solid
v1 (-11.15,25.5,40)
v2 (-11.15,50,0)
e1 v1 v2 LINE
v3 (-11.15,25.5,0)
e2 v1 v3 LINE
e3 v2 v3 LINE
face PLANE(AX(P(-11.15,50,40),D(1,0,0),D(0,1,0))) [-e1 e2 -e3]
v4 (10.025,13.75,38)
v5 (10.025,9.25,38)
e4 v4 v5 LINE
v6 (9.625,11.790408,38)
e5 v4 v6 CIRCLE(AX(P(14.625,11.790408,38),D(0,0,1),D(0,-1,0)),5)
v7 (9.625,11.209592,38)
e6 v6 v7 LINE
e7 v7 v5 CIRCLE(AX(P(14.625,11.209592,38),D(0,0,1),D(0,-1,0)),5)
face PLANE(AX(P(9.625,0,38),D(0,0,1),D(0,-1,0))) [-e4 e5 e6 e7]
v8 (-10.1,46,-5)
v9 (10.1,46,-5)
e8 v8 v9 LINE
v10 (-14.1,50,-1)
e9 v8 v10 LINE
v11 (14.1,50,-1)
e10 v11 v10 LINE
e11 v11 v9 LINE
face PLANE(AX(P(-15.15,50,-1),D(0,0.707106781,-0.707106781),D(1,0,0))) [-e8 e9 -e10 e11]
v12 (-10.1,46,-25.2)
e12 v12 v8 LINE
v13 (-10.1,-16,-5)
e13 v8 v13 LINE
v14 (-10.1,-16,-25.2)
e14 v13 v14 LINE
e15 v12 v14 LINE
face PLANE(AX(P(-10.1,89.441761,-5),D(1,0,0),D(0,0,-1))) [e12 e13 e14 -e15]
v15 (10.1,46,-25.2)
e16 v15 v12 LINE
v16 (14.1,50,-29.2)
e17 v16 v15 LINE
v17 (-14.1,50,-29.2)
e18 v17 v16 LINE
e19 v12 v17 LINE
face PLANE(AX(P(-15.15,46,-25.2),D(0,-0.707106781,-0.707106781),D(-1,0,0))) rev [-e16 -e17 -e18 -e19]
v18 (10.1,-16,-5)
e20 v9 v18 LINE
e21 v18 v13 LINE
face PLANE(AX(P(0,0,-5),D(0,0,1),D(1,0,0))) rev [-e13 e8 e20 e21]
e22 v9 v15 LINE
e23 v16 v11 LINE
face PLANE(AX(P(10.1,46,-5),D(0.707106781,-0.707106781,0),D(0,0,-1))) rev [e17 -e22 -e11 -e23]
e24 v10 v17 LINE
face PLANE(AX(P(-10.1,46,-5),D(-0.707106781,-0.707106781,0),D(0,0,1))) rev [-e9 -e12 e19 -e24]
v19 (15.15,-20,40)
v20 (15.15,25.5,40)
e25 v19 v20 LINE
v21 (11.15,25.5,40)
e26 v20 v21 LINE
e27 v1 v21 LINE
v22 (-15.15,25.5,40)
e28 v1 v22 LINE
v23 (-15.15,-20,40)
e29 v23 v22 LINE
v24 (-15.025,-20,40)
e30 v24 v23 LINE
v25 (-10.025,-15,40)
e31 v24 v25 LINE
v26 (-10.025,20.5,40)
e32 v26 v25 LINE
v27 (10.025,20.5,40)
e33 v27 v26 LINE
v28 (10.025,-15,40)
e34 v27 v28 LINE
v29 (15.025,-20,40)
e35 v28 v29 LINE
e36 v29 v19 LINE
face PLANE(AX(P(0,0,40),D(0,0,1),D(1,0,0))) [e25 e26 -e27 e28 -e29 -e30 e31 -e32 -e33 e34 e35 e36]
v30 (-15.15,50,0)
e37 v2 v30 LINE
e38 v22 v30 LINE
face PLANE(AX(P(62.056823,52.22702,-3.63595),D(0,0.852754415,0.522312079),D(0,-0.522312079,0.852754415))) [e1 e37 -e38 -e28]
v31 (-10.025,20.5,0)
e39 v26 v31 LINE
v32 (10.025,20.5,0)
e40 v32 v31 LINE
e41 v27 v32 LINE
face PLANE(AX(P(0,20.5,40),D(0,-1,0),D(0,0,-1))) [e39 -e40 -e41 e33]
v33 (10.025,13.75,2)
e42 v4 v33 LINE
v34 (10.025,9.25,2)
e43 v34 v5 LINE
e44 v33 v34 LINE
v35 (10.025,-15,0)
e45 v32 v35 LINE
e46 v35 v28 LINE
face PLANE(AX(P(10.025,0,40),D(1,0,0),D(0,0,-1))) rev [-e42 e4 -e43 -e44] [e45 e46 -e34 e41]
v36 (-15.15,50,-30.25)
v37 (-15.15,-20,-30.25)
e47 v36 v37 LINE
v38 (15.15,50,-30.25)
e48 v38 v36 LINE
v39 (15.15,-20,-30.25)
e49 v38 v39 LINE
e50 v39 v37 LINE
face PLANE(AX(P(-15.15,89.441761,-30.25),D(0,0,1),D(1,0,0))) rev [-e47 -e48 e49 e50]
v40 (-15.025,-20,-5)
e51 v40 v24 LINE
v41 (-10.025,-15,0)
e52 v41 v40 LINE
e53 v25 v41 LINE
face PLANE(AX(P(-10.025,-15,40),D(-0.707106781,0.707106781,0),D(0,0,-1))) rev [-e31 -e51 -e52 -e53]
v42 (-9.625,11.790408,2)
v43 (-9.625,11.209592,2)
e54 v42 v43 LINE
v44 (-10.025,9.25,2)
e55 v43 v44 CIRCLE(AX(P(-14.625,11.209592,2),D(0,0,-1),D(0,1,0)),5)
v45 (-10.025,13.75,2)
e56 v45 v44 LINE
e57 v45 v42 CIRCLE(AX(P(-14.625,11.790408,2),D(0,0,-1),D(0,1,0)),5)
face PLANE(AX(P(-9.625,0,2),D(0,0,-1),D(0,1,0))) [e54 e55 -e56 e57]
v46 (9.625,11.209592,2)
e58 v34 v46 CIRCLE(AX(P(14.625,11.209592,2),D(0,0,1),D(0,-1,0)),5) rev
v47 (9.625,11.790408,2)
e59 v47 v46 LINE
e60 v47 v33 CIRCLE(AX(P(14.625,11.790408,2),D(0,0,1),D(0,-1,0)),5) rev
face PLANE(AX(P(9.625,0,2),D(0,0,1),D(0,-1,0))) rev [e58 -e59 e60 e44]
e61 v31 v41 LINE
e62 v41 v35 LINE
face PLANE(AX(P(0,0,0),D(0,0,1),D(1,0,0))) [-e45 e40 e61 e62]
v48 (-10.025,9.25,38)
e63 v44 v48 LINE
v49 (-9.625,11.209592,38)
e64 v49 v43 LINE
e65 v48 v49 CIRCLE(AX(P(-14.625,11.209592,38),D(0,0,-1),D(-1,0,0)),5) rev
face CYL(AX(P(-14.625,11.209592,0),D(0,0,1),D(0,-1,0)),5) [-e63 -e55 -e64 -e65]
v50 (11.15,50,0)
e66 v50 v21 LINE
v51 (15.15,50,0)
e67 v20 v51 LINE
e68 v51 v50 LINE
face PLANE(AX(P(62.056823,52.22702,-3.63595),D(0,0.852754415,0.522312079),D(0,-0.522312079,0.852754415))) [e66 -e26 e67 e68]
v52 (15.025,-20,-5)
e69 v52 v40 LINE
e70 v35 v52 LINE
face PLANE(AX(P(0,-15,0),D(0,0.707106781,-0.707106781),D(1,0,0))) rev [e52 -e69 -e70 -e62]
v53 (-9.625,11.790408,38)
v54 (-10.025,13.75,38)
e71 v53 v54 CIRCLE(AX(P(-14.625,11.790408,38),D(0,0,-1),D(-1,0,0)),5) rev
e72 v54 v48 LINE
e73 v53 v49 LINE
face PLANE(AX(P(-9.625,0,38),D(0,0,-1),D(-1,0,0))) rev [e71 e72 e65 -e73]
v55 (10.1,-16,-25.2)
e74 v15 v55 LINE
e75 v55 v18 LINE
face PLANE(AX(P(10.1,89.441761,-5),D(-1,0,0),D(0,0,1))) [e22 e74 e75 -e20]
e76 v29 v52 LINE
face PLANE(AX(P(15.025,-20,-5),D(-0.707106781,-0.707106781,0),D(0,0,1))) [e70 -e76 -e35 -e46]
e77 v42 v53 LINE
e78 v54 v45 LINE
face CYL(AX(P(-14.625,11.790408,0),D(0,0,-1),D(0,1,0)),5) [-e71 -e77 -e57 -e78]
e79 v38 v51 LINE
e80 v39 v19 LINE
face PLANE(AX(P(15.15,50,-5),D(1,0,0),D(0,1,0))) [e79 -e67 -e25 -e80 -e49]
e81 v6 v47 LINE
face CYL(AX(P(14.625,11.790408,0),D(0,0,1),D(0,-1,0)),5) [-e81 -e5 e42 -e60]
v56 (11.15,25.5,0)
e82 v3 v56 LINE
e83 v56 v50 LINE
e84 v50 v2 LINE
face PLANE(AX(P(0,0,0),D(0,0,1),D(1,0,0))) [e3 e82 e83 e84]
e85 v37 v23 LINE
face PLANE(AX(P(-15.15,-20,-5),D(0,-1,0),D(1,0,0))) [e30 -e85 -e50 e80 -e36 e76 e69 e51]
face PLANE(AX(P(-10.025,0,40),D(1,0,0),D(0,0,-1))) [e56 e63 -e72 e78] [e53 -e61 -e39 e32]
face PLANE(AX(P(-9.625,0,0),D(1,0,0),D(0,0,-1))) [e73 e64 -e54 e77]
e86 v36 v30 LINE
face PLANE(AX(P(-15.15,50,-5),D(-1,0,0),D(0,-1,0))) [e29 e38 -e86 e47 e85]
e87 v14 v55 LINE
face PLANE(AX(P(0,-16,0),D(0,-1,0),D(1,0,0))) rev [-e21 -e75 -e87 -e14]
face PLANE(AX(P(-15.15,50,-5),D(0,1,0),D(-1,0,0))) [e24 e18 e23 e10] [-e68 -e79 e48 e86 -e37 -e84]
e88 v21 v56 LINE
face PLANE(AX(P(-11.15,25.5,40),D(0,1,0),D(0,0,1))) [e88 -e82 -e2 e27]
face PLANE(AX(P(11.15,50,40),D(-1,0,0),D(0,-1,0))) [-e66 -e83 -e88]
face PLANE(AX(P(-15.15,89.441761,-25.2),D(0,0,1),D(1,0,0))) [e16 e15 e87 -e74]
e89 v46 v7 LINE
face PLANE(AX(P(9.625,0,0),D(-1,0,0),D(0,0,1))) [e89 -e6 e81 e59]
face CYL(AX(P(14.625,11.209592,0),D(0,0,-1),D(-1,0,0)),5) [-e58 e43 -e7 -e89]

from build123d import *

# Parameters (mm, degrees)
CROQUIS2_W               = 30.3
CROQUIS2_H               = 70
SALIENTE_EXTRUIR2_DEPTH  = 5
SALIENTE_EXTRUIR3_START  = -20
SALIENTE_EXTRUIR3_DEPTH  = 70
SALIENTE_EXTRUIR4_START  = -20
CROQUIS4_W               = 20.2
CROQUIS4_H               = 20.2
SALIENTE_EXTRUIR4_DEPTH  = 4
CHAFL_N4_SIZE            = 4
CROQUIS6_W               = 30.3
CROQUIS6_H               = 5
CROQUIS6_W_2             = 5.125
CROQUIS6_H_2             = 40.5
SALIENTE_EXTRUIR6_DEPTH  = 40
SALIENTE_EXTRUIR7_START  = -15.15
SALIENTE_EXTRUIR7_DEPTH  = 30.3
CROQUIS8_W               = 22.3
CROQUIS8_H               = 24.5
CORTAR_EXTRUIR1_DEPTH    = 40
CHAFL_N9_SIZE            = 5
SALIENTE_EXTRUIR9_DEPTH  = 0.4
REDONDEO3_R              = 5
SALIENTE_EXTRUIR10_DEPTH = 0.4
REDONDEO4_R              = 5


with BuildPart() as part:
    # Croquis2 → Saliente-Extruir2 (new body)
    with BuildSketch(Plane.XY):
        with Locations((0, 15)):
            Rectangle(CROQUIS2_W, CROQUIS2_H)
    extrude(amount=-SALIENTE_EXTRUIR2_DEPTH)

    # Croquis3 → Saliente-Extruir3 (add)
    with BuildSketch(Plane(origin=(0, 0, 0), x_dir=(1, 0, 0), z_dir=(0, 1, 0)).offset(SALIENTE_EXTRUIR3_START)):
        Polygon((-15.15, 30.25), (-15.15, 5), (-10.1, 5), (-10.1, 25.2), (10.1, 25.2), (10.1, 5), (15.15, 5), (15.15, 30.25), align=None)
    extrude(amount=SALIENTE_EXTRUIR3_DEPTH)

    # Croquis4 → Saliente-Extruir4 (add)
    with BuildSketch(Plane(origin=(0, 0, 0), x_dir=(1, 0, 0), z_dir=(0, 1, 0)).offset(SALIENTE_EXTRUIR4_START)):
        with Locations((0, 15.1)):
            Rectangle(CROQUIS4_W, CROQUIS4_H)
    extrude(amount=SALIENTE_EXTRUIR4_DEPTH)

    # Chaflán4
    chafl_n4_edges = [part.edges().sort_by_distance(p)[0] for p in [
        (0, 50, -5),
        (10.1, 50, -15.1),
        (0, 50, -25.2),
        (-10.1, 50, -15.1),
    ]]
    chamfer(chafl_n4_edges, length=CHAFL_N4_SIZE)

    # Croquis6 → Saliente-Extruir6 (add)
    with BuildSketch(Plane.XY):
        with Locations((0, 23)):
            Rectangle(CROQUIS6_W, CROQUIS6_H)
        with Locations((-12.5875, 0.25)):
            Rectangle(CROQUIS6_W_2, CROQUIS6_H_2)
        with Locations((12.5875, 0.25)):
            Rectangle(CROQUIS6_W_2, CROQUIS6_H_2)
    extrude(amount=SALIENTE_EXTRUIR6_DEPTH)

    # Croquis7 → Saliente-Extruir7 (add)
    with BuildSketch(Plane(origin=(0, 0, 0), x_dir=(0, 0, -1), z_dir=(1, 0, 0)).offset(SALIENTE_EXTRUIR7_START)):
        Polygon((-40, 25.5), (0, 50), (0, 25.5), align=None)
    extrude(amount=SALIENTE_EXTRUIR7_DEPTH)

    # Croquis8 → Cortar-Extruir1 (cut)
    with BuildSketch(Plane.XY):
        with Locations((0, 37.75)):
            Rectangle(CROQUIS8_W, CROQUIS8_H)
    extrude(amount=CORTAR_EXTRUIR1_DEPTH, mode=Mode.SUBTRACT)

    # Chaflán9
    chafl_n9_edges = [part.edges().sort_by_distance(p)[0] for p in [
        (0, -20, 0),
        (-10.025, -20, 20),
        (10.025, -20, 20),
    ]]
    chamfer(chafl_n9_edges, length=CHAFL_N9_SIZE)

    # Croquis22 → Saliente-Extruir9 (add)
    with BuildSketch(Plane(origin=(-10.025, 0, 0), x_dir=(0, 0, -1), z_dir=(1, 0, 0))):
        Polygon((-2, 13.75), (-10, 13.75), (-30, 13.75), (-38, 13.75), (-38, 9.25), (-30, 9.25), (-10, 9.25), (-2, 9.25), align=None)
    extrude(amount=SALIENTE_EXTRUIR9_DEPTH)

    # Redondeo3
    # the kernel refuses this fillet: 5 mm, written as the material it takes off along each edge
    with BuildSketch(Plane(origin=(-9.625, 9.25, 2), x_dir=(-1, 0, 0), z_dir=(0, 0, 1)), Plane(origin=(-9.625, 13.75, 42.898979486), x_dir=(-1, 0, 0), z_dir=(0, 0, -1))) as redondeo3_piece_1:
        with BuildLine():
            CenterArc((5, -1.959591794), REDONDEO3_R, 156.926081934, 23.073918066)
            Line((0, -1.959591794), (0, 0))
            Line((0, 0), (0.4, 0))
        make_face()
    extrude(amount=40.898979486, mode=Mode.SUBTRACT)

    # Croquis26 → Saliente-Extruir10 (add)
    with BuildSketch(Plane.ZY.offset(-10.025)):
        Polygon((10, 13.75), (2, 13.75), (2, 9.25), (10, 9.25), (30, 9.25), (38, 9.25), (38, 13.75), (30, 13.75), align=None)
    extrude(amount=SALIENTE_EXTRUIR10_DEPTH)

    # Redondeo4
    # the kernel refuses this fillet: 5 mm, written as the material it takes off along each edge
    with BuildSketch(Plane(origin=(9.625, 9.25, 42.898979486), x_dir=(1, 0, 0), z_dir=(0, 0, -1)), Plane(origin=(9.625, 13.75, 2), x_dir=(1, 0, 0), z_dir=(0, 0, 1))) as redondeo4_piece_1:
        with BuildLine():
            CenterArc((5, -1.959591794), REDONDEO4_R, 156.926081934, 23.073918066)
            Line((0, -1.959591794), (0, 0))
            Line((0, 0), (0.4, 0))
        make_face()
    extrude(amount=40.898979486, mode=Mode.SUBTRACT)


solid = part.part
